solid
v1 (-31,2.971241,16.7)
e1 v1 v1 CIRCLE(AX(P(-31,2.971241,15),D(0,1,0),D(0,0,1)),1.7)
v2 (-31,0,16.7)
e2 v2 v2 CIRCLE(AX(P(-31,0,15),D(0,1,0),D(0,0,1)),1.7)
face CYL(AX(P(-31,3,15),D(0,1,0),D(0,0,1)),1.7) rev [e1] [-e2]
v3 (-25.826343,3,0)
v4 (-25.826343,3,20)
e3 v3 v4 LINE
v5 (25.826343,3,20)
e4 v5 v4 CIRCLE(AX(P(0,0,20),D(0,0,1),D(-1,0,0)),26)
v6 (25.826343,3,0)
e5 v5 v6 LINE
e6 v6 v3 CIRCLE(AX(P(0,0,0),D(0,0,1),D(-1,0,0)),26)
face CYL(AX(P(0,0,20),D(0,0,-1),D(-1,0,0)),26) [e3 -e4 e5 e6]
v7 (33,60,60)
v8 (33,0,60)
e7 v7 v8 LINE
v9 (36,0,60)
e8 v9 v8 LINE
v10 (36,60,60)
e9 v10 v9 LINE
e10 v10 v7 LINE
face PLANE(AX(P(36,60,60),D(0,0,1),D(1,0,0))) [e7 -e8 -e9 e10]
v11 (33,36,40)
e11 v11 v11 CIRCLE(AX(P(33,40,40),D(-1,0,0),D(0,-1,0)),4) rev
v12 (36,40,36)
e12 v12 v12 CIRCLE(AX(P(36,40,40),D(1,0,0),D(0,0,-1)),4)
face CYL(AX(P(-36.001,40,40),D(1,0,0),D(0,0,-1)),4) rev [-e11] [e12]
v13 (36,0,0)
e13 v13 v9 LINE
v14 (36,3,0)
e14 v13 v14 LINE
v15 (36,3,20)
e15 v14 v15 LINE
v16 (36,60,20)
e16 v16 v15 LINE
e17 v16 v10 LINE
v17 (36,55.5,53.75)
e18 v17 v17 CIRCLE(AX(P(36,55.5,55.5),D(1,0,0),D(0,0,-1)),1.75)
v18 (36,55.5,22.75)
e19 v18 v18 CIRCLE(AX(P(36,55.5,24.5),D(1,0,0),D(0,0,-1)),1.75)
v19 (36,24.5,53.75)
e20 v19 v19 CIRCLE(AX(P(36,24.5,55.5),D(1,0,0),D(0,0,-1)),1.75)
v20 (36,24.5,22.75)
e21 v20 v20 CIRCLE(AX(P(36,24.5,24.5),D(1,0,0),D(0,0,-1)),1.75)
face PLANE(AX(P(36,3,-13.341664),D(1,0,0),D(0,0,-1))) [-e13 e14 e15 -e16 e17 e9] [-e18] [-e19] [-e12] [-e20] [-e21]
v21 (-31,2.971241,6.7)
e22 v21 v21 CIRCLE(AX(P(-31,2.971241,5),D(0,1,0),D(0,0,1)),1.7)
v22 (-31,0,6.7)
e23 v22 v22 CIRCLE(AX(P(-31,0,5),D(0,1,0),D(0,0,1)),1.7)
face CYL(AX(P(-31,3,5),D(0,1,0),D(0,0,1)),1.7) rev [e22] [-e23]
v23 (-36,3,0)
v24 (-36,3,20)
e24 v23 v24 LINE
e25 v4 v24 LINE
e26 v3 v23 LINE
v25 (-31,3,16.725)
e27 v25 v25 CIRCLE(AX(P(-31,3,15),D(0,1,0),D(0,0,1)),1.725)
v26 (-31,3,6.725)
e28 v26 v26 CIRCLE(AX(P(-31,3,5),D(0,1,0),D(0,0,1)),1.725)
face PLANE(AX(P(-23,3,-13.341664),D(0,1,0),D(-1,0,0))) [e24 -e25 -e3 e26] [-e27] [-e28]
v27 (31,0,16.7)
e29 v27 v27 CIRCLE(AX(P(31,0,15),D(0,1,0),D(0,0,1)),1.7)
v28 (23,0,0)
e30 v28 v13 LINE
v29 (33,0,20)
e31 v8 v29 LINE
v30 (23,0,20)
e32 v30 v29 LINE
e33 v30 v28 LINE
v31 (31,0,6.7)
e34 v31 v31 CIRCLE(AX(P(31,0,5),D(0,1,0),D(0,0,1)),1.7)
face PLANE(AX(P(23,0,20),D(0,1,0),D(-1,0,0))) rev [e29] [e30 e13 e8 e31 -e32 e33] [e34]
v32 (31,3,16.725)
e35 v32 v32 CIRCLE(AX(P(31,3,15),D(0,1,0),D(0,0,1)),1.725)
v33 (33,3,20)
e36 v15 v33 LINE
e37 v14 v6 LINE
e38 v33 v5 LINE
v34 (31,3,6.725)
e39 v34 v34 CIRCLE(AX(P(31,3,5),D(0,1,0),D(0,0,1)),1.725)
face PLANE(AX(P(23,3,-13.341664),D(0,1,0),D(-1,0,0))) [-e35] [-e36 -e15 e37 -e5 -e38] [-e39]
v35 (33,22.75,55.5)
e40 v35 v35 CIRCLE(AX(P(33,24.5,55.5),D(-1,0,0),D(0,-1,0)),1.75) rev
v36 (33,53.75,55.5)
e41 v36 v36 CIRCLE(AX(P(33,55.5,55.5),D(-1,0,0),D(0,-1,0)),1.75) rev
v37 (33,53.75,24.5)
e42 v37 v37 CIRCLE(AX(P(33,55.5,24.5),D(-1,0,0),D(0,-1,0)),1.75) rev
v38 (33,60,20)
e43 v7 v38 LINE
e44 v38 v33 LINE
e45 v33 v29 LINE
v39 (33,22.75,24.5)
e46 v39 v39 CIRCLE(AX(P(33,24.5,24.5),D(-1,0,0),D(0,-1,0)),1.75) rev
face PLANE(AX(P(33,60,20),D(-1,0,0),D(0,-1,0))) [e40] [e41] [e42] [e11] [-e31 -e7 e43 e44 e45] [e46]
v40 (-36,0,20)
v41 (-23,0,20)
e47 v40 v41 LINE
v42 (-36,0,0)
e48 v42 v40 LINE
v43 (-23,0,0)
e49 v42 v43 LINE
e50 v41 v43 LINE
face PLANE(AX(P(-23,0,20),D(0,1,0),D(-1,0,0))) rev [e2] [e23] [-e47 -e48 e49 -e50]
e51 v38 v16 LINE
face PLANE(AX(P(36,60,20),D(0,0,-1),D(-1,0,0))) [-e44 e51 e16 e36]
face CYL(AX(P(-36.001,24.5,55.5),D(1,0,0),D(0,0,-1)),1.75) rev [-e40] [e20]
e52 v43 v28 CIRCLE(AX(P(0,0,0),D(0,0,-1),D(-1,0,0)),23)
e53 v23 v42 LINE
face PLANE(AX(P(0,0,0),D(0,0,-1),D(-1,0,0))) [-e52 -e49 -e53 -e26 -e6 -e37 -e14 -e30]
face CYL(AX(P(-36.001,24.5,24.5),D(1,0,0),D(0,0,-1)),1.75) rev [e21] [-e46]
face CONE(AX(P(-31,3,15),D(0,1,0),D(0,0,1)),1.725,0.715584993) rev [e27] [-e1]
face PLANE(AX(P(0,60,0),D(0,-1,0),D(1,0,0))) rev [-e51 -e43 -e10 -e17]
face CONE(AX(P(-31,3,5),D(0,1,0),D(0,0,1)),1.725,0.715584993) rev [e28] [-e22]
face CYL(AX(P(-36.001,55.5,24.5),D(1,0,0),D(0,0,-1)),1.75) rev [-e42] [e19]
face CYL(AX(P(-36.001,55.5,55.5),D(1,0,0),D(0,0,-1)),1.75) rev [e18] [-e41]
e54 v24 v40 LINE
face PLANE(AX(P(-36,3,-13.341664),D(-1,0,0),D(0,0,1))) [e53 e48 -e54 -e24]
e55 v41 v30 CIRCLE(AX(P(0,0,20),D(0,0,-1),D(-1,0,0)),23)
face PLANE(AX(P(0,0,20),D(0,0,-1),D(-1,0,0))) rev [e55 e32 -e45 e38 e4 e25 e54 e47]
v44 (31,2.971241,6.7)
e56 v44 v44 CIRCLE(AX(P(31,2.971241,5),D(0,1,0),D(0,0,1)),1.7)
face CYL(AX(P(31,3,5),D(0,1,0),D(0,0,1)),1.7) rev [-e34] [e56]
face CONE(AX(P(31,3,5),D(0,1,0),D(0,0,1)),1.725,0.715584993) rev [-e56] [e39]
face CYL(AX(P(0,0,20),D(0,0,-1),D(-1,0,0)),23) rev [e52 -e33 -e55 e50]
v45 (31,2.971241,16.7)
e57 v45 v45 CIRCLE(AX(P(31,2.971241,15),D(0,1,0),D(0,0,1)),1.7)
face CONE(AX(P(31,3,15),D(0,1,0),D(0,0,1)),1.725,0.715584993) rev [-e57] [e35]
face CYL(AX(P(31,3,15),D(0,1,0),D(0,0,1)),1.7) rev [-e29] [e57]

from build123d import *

# Parameters (mm, degrees)
EXTRUDE_1_DEPTH     = 20
SKETCH_2_W          = 13
SKETCH_2_H          = 3
EXTRUDE_2_DEPTH     = 20
SKETCH_5_W          = 3
SKETCH_5_H          = 40
EXTRUDE_3_DEPTH     = 60
CUT_EXTRUDE_1_REACH = 113.283
SKETCH_6_R          = 4
SKETCH_6_R_2        = 1.75


# Read off the part's stored shape, not the designer's step: M3 すきま穴1
with BuildPart() as part:
    # ｽｹｯﾁ1 → ﾎﾞｽ - 押し出し1 (new body)
    with BuildSketch(Plane.XY):
        with BuildLine():
            Line((-23, 0), (-26, 0))
            ThreePointArc((-26, 0), (0, 26), (26, 0))
            Line((26, 0), (23, 0))
            ThreePointArc((23, 0), (0, 23), (-23, 0))
        make_face()
    extrude(amount=EXTRUDE_1_DEPTH)

    # ｽｹｯﾁ2 → ﾎﾞｽ - 押し出し2 (add)
    with BuildSketch(Plane.XY.offset(20)):
        with Locations((-29.5, 1.5)):
            Rectangle(SKETCH_2_W, SKETCH_2_H)
        with Locations((29.5, 1.5)):
            Rectangle(SKETCH_2_W, SKETCH_2_H)
    extrude(amount=-EXTRUDE_2_DEPTH)

    # M3 すきま穴1 outline → M3 すきま穴1 (revolve, cut)
    with BuildSketch(Plane(origin=(31, 0, 15), x_dir=(1, 0, 0), z_dir=(0, 0, 1))):
        Polygon((0, 0), (1.7, 0), (1.7, 2.97124079), (1.725, 3), (0, 3), align=None)
    revolve(axis=Axis((31, 0, 15), (0, 1, 0)), mode=Mode.SUBTRACT)

    # Hole Wizard M3 _1 2 outline → Hole Wizard M3 _1 2 (revolve, cut)
    with BuildSketch(Plane(origin=(31, 0, 5), x_dir=(1, 0, 0), z_dir=(0, 0, 1))):
        Polygon((0, 0), (1.7, 0), (1.7, 2.97124079), (1.725, 3), (0, 3), align=None)
    revolve(axis=Axis((31, 0, 5), (0, 1, 0)), mode=Mode.SUBTRACT)

    # Hole Wizard M3 _1 3 outline → Hole Wizard M3 _1 3 (revolve, cut)
    with BuildSketch(Plane(origin=(-31, 0, 15), x_dir=(1, 0, 0), z_dir=(0, 0, 1))):
        Polygon((0, 0), (1.7, 0), (1.7, 2.97124079), (1.725, 3), (0, 3), align=None)
    revolve(axis=Axis((-31, 0, 15), (0, 1, 0)), mode=Mode.SUBTRACT)

    # Hole Wizard M3 _1 4 outline → Hole Wizard M3 _1 4 (revolve, cut)
    with BuildSketch(Plane(origin=(-31, 0, 5), x_dir=(1, 0, 0), z_dir=(0, 0, 1))):
        Polygon((0, 0), (1.7, 0), (1.7, 2.97124079), (1.725, 3), (0, 3), align=None)
    revolve(axis=Axis((-31, 0, 5), (0, 1, 0)), mode=Mode.SUBTRACT)

    # ｽｹｯﾁ5 → ﾎﾞｽ - 押し出し3 (add)
    with BuildSketch(Plane.XZ):
        with Locations((34.5, 40)):
            Rectangle(SKETCH_5_W, SKETCH_5_H)
    extrude(amount=-EXTRUDE_3_DEPTH)

    # ｽｹｯﾁ6 → ｶｯﾄ - 押し出し1 (cut, up to next)
    with BuildSketch(Plane(origin=(36, 0, 0), x_dir=(0, 0, -1), z_dir=(1, 0, 0)), mode=Mode.PRIVATE) as cut_extrude_1_sk1:
        with Locations((-40, 40)):
            Circle(SKETCH_6_R)
    cut_extrude_1_tool1 = extrude(cut_extrude_1_sk1.sketch, amount=-CUT_EXTRUDE_1_REACH, mode=Mode.PRIVATE) & part.part
    # ｽｹｯﾁ6 → ｶｯﾄ - 押し出し1 (cut, up to next)
    with BuildSketch(Plane(origin=(36, 0, 0), x_dir=(0, 0, -1), z_dir=(1, 0, 0)), mode=Mode.PRIVATE) as cut_extrude_1_sk2:
        with Locations((-24.5, 55.5)):
            Circle(SKETCH_6_R_2)
    cut_extrude_1_tool2 = extrude(cut_extrude_1_sk2.sketch, amount=-CUT_EXTRUDE_1_REACH, mode=Mode.PRIVATE) & part.part
    # ｽｹｯﾁ6 → ｶｯﾄ - 押し出し1 (cut, up to next)
    with BuildSketch(Plane(origin=(36, 0, 0), x_dir=(0, 0, -1), z_dir=(1, 0, 0)), mode=Mode.PRIVATE) as cut_extrude_1_sk3:
        with Locations((-24.5, 24.5)):
            Circle(SKETCH_6_R_2)
    cut_extrude_1_tool3 = extrude(cut_extrude_1_sk3.sketch, amount=-CUT_EXTRUDE_1_REACH, mode=Mode.PRIVATE) & part.part
    # ｽｹｯﾁ6 → ｶｯﾄ - 押し出し1 (cut, up to next)
    with BuildSketch(Plane(origin=(36, 0, 0), x_dir=(0, 0, -1), z_dir=(1, 0, 0)), mode=Mode.PRIVATE) as cut_extrude_1_sk4:
        with Locations((-55.5, 24.5)):
            Circle(SKETCH_6_R_2)
    cut_extrude_1_tool4 = extrude(cut_extrude_1_sk4.sketch, amount=-CUT_EXTRUDE_1_REACH, mode=Mode.PRIVATE) & part.part
    # ｽｹｯﾁ6 → ｶｯﾄ - 押し出し1 (cut, up to next)
    with BuildSketch(Plane(origin=(36, 0, 0), x_dir=(0, 0, -1), z_dir=(1, 0, 0)), mode=Mode.PRIVATE) as cut_extrude_1_sk5:
        with Locations((-55.5, 55.5)):
            Circle(SKETCH_6_R_2)
    cut_extrude_1_tool5 = extrude(cut_extrude_1_sk5.sketch, amount=-CUT_EXTRUDE_1_REACH, mode=Mode.PRIVATE) & part.part
    add(cut_extrude_1_tool1.solids().sort_by_distance((36, 40, 40))[0], mode=Mode.SUBTRACT)
    add(cut_extrude_1_tool2.solids().sort_by_distance((36, 55.5, 24.5))[0], mode=Mode.SUBTRACT)
    add(cut_extrude_1_tool3.solids().sort_by_distance((36, 24.5, 24.5))[0], mode=Mode.SUBTRACT)
    add(cut_extrude_1_tool4.solids().sort_by_distance((36, 24.5, 55.5))[0], mode=Mode.SUBTRACT)
    add(cut_extrude_1_tool5.solids().sort_by_distance((36, 55.5, 55.5))[0], mode=Mode.SUBTRACT)


solid = part.part
